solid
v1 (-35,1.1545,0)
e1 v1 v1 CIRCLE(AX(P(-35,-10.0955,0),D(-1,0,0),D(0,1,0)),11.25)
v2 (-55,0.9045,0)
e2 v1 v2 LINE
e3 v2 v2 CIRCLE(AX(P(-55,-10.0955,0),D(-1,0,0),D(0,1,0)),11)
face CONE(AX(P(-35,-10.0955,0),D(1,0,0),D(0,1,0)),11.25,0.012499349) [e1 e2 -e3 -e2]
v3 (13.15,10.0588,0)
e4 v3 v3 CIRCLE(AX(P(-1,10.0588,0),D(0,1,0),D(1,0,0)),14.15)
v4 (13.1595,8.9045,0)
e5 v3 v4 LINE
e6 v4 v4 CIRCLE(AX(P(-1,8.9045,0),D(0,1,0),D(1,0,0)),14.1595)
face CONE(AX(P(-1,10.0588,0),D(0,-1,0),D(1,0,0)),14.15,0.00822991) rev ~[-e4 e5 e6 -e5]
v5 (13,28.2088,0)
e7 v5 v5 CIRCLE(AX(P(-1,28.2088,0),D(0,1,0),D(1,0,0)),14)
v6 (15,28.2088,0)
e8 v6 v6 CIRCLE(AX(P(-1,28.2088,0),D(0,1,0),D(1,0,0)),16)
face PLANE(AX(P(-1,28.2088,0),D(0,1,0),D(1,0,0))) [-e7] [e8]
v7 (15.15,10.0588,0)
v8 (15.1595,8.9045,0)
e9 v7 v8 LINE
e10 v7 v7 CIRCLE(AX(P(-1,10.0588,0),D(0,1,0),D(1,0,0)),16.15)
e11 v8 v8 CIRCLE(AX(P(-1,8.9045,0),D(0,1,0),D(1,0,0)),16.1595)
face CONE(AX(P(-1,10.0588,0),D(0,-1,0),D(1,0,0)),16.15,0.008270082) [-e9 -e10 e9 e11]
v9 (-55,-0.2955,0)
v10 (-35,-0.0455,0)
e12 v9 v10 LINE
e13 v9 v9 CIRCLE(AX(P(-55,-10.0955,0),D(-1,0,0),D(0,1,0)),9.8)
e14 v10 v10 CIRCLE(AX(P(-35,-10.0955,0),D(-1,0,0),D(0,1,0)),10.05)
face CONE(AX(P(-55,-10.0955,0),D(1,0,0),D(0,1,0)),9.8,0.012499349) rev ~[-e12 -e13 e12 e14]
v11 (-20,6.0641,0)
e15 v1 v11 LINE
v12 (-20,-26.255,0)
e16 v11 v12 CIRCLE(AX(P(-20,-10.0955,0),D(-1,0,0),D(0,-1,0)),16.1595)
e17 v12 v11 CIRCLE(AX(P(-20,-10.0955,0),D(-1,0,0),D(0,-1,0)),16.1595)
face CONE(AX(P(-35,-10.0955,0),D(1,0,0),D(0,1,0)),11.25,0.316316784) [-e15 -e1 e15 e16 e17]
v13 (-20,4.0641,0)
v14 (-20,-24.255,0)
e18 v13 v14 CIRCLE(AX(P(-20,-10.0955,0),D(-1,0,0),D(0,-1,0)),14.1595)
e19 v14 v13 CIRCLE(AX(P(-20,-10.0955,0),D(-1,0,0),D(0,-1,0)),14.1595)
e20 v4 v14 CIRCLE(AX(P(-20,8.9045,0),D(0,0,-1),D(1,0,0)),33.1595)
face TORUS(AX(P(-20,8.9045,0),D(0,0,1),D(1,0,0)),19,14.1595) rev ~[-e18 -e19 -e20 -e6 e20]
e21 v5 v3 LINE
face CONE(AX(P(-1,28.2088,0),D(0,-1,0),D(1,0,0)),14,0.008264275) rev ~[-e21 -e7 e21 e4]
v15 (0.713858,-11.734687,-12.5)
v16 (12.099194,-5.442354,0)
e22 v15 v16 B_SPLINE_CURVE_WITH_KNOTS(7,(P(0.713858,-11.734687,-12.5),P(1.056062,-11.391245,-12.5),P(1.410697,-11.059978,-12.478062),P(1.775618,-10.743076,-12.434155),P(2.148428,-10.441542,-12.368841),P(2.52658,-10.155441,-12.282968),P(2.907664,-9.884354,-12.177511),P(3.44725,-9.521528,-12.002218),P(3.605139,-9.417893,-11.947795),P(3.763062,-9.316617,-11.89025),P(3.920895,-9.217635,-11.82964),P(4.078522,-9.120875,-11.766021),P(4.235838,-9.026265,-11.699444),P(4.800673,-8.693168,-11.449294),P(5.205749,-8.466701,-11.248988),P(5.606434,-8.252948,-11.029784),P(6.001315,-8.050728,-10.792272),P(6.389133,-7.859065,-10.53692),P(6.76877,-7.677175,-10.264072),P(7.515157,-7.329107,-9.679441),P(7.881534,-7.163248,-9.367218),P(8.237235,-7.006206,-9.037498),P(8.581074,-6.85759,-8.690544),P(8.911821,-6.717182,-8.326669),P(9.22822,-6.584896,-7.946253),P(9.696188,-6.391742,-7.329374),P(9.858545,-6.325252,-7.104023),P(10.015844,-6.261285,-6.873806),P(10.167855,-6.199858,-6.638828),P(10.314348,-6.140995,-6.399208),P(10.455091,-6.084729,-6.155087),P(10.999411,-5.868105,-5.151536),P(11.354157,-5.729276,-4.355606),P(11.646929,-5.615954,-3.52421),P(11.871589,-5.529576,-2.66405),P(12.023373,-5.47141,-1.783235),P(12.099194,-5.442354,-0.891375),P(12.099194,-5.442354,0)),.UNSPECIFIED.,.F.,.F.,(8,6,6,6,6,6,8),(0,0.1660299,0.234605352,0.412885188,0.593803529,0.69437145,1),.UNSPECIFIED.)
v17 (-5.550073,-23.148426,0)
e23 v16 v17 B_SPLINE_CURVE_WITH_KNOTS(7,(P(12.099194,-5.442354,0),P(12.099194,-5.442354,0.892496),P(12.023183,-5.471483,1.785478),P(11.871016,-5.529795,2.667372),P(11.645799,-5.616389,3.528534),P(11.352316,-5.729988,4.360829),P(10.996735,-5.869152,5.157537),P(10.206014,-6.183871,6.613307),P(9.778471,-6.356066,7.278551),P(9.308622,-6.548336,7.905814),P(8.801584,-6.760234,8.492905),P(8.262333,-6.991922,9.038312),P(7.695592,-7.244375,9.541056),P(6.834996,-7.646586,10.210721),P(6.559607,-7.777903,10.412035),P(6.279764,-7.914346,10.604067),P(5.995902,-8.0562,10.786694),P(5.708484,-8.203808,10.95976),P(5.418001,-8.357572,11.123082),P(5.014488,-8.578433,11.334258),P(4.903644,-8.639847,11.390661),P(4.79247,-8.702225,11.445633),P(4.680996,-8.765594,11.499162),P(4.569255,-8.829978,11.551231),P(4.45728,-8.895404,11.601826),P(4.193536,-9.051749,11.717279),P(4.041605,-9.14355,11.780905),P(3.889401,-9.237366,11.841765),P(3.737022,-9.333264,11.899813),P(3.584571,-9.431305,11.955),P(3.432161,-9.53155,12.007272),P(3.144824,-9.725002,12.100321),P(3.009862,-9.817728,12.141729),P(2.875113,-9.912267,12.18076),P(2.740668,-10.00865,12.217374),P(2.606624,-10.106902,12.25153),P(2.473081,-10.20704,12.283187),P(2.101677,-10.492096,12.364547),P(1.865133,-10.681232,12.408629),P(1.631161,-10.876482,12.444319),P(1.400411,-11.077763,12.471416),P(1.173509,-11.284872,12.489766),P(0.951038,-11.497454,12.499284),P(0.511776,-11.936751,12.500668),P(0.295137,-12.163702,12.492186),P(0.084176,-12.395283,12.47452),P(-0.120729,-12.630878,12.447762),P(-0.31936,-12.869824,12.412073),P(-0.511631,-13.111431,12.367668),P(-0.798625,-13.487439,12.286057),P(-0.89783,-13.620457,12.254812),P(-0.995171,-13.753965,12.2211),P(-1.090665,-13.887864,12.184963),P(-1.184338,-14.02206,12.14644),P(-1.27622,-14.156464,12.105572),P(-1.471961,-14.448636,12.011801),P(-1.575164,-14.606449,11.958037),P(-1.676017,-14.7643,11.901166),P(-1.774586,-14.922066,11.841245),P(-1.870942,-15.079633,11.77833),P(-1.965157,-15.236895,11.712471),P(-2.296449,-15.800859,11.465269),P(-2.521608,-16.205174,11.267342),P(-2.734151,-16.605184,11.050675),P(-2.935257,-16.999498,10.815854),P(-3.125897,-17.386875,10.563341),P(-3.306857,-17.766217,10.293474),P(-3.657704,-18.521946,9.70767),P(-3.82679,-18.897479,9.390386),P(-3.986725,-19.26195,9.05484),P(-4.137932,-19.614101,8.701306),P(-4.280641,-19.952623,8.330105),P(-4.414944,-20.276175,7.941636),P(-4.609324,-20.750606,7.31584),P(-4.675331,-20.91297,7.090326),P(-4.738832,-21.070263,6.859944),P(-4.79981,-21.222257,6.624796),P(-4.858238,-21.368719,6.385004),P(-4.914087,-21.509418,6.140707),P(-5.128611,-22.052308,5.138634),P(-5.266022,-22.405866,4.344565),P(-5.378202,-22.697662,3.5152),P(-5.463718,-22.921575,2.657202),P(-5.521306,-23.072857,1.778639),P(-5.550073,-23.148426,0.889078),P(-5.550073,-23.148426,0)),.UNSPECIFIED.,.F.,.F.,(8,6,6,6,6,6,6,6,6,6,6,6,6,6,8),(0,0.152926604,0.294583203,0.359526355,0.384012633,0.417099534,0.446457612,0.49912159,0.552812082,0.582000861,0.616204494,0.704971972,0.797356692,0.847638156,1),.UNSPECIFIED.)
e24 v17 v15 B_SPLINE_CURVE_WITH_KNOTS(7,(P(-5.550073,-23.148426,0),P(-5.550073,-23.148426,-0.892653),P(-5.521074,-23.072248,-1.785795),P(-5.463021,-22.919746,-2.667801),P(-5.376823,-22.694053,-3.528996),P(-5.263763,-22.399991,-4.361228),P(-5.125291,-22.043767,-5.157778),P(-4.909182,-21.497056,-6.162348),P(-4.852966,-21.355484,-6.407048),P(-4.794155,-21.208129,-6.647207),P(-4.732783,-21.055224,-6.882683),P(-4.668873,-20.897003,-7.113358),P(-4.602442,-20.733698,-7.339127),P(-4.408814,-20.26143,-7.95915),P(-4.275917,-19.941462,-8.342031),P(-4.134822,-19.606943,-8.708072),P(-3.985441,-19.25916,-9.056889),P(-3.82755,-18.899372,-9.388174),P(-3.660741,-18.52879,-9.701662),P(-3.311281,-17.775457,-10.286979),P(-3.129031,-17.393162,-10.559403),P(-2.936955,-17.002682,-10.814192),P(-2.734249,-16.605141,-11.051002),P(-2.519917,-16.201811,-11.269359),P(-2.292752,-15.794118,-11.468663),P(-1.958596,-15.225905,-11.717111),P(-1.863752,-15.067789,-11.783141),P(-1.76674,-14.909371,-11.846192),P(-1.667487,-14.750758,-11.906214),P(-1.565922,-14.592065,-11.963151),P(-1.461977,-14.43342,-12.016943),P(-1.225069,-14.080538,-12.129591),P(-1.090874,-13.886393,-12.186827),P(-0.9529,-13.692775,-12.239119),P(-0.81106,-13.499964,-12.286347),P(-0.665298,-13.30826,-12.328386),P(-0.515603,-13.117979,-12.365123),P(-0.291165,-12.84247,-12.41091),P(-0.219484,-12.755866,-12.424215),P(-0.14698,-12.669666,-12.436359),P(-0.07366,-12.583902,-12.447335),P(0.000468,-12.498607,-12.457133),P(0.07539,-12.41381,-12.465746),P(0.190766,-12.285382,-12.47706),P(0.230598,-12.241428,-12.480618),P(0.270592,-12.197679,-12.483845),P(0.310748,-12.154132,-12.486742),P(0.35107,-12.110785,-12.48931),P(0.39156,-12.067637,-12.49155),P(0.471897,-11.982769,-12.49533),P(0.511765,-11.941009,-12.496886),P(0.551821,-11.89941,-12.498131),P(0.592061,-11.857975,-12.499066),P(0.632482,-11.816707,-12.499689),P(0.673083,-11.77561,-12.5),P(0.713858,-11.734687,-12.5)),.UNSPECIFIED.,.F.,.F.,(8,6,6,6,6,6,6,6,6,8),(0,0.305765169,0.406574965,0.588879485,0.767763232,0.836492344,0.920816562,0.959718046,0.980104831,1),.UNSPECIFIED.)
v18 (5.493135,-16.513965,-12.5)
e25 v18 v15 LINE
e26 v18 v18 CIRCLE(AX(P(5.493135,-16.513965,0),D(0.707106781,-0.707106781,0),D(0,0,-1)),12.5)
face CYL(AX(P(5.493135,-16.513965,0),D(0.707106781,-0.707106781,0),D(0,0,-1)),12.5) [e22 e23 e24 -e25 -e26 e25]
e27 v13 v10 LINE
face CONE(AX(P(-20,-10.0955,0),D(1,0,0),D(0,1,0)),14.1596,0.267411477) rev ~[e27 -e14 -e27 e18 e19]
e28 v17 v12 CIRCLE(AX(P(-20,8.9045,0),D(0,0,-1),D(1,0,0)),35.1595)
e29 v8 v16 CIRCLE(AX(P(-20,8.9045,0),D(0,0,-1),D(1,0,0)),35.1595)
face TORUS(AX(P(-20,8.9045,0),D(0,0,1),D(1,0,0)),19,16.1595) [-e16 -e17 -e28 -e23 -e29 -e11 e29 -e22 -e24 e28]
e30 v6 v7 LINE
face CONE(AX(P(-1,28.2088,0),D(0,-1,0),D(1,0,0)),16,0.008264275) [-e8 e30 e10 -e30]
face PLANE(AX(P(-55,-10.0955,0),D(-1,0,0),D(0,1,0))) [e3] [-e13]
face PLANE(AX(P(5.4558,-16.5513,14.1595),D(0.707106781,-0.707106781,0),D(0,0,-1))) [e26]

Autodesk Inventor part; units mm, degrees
sketch "Sketch1" plane through (0, 0, 0) normal (0, 0, 1) x (1, 0, 0)
  line L0 (15, 28.2088) -> (15.15, 10.0588)
  line L1 (13, 28.2088) -> (13.15, 10.0588)
  line L2 (13.15, 10.0588) -> (13.1595, 8.9045)
  line L3 (15.15, 10.0588) -> (15.1653, 8.2088)
  line L4 (15.1653, 8.2088) -> (10.25, -5.7912)
  line L5 (10.25, -5.7912) -> (10.25, -5.7912)
  line L6 (8, -5.7712) -> (8, -5.7912)
  line L7 (13.1595, 8.9045) -> (8, -5.7912)
  line L8 (15, 28.2088) -> (13, 28.2088)
  line L9 (0, -12.5912) -> (0, 35.0088) construction
  line L10 (-1, 0) -> (-1, 28.2088) construction
  line L11 (10.25, -5.7912) -> (8, -5.7912)
  line L12 (13.1595, 8.9045) -> (15.1595, 8.9045)
  point P0 (0, 0)
  point P1 (0, 0)
  point P2 (-1, 22.6667)
  dimension "d0" = 2
  dimension "d1" = 2
  dimension "d2" = 0
  dimension "d3" = 0
  dimension "d4" = 18.15
  dimension "d5" = 1.9999
  dimension "d6" = 14
  dimension "d7" = 0
  dimension "d8" = 1.85
  dimension "d9" = 2.123
  dimension "d10" = 1
revolve "Revolution1" add sketch "Sketch1" angle 360 about axis through (-1, 0, 0) along (0, 1, 0) contours L0 L3 L12 L2 L1 L8
ref_plane "Work Plane1" through (-20, 0, 0) normal (1, 0, 0) x (0, 1, 0)
sketch "Sketch2" plane through (-20, 0, 0) normal (1, 0, 0) x (0, 1, 0)
  line L0 (8.9045, 14.1595) -> (8.9045, -14.1595) construction
  line L1 (8.9045, 0) -> (-10.0955, 0) construction
  point P0 (0, 0)
  dimension "d13" = 19
sketch "Sketch3" plane through (-1, 8.9045, 0) normal (0, -1, 0) x (1, 0, 0)
  circle A0 centre (0, 0) radius 16.1595 projected
  circle A1 centre (0, 0) radius 14.1595 projected
  point P0 (1, 0)
revolve "Revolution2" add sketch "Sketch3" angle 90 about axis through (-20, 8.9045, 14.1595) along (0, 0, -1)
ref_plane "Work Plane2" through (0, 0, 0) normal (0, 0, 1) x (1, 0, 0)
sketch "Sketch4" plane through (0, 0, 0) normal (0, 0, 1) x (1, 0, 0)
  line L0 (-20, 6.0641) -> (-20, -26.255) construction
  line L1 (-20, -10.0955) -> (-35, -10.0955) construction
  line L2 (-35, -10.0955) -> (-55, -10.0955) construction
  line L3 (-55, -10.0955) -> (-55, 0.9045) construction
  line L4 (-35, -10.0955) -> (-35, 1.1545) construction
  line L5 (-35, 1.1545) -> (-55, 0.9045)
  line L6 (-55, 0.9045) -> (-55, -0.2955)
  line L7 (-55, -0.2955) -> (-35, -0.0455)
  line L8 (-20, -24.255) -> (-20, 4.0641) projected
  line L9 (-20, 4.0641) -> (-35, -0.0455)
  line L10 (-35, 1.1545) -> (-20, 6.0641)
  line L11 (-20, 6.0641) -> (-20, 4.0641)
  point P0 (0, 0)
  dimension "d16" = 15
  dimension "d17" = 20
  dimension "d18" = 11
  dimension "d19" = 11.25
  dimension "d20" = 1.2
  dimension "d21" = 1.2
revolve "Revolution3" add sketch "Sketch4" angle 360 about axis through (-35, -10.0955, 0) along (-1, 0, 0)
ref_plane "Work Plane4" through (5.4558, -16.5513, 14.1595) normal (0.7071068, -0.7071068, 0) x (0, 0, -1)
ref_plane "Work Plane3" through (-20, 8.9045, 14.1595) normal (0.7071068, -0.7071068, 0) x (0, 0, -1)
sketch "Sketch5" plane through (5.4558, -16.5513, 14.1595) normal (0.7071068, -0.7071068, 0) x (0, 0, -1)
  circle A0 centre (14.1595, 0.0528) radius 12.5
  point P0 (14.1595, 7.8457)
  dimension "d25" = 25
extrude "Extrusion1" add sketch "Sketch5" against normal up to surface
properties part number "Ambu90deg"
